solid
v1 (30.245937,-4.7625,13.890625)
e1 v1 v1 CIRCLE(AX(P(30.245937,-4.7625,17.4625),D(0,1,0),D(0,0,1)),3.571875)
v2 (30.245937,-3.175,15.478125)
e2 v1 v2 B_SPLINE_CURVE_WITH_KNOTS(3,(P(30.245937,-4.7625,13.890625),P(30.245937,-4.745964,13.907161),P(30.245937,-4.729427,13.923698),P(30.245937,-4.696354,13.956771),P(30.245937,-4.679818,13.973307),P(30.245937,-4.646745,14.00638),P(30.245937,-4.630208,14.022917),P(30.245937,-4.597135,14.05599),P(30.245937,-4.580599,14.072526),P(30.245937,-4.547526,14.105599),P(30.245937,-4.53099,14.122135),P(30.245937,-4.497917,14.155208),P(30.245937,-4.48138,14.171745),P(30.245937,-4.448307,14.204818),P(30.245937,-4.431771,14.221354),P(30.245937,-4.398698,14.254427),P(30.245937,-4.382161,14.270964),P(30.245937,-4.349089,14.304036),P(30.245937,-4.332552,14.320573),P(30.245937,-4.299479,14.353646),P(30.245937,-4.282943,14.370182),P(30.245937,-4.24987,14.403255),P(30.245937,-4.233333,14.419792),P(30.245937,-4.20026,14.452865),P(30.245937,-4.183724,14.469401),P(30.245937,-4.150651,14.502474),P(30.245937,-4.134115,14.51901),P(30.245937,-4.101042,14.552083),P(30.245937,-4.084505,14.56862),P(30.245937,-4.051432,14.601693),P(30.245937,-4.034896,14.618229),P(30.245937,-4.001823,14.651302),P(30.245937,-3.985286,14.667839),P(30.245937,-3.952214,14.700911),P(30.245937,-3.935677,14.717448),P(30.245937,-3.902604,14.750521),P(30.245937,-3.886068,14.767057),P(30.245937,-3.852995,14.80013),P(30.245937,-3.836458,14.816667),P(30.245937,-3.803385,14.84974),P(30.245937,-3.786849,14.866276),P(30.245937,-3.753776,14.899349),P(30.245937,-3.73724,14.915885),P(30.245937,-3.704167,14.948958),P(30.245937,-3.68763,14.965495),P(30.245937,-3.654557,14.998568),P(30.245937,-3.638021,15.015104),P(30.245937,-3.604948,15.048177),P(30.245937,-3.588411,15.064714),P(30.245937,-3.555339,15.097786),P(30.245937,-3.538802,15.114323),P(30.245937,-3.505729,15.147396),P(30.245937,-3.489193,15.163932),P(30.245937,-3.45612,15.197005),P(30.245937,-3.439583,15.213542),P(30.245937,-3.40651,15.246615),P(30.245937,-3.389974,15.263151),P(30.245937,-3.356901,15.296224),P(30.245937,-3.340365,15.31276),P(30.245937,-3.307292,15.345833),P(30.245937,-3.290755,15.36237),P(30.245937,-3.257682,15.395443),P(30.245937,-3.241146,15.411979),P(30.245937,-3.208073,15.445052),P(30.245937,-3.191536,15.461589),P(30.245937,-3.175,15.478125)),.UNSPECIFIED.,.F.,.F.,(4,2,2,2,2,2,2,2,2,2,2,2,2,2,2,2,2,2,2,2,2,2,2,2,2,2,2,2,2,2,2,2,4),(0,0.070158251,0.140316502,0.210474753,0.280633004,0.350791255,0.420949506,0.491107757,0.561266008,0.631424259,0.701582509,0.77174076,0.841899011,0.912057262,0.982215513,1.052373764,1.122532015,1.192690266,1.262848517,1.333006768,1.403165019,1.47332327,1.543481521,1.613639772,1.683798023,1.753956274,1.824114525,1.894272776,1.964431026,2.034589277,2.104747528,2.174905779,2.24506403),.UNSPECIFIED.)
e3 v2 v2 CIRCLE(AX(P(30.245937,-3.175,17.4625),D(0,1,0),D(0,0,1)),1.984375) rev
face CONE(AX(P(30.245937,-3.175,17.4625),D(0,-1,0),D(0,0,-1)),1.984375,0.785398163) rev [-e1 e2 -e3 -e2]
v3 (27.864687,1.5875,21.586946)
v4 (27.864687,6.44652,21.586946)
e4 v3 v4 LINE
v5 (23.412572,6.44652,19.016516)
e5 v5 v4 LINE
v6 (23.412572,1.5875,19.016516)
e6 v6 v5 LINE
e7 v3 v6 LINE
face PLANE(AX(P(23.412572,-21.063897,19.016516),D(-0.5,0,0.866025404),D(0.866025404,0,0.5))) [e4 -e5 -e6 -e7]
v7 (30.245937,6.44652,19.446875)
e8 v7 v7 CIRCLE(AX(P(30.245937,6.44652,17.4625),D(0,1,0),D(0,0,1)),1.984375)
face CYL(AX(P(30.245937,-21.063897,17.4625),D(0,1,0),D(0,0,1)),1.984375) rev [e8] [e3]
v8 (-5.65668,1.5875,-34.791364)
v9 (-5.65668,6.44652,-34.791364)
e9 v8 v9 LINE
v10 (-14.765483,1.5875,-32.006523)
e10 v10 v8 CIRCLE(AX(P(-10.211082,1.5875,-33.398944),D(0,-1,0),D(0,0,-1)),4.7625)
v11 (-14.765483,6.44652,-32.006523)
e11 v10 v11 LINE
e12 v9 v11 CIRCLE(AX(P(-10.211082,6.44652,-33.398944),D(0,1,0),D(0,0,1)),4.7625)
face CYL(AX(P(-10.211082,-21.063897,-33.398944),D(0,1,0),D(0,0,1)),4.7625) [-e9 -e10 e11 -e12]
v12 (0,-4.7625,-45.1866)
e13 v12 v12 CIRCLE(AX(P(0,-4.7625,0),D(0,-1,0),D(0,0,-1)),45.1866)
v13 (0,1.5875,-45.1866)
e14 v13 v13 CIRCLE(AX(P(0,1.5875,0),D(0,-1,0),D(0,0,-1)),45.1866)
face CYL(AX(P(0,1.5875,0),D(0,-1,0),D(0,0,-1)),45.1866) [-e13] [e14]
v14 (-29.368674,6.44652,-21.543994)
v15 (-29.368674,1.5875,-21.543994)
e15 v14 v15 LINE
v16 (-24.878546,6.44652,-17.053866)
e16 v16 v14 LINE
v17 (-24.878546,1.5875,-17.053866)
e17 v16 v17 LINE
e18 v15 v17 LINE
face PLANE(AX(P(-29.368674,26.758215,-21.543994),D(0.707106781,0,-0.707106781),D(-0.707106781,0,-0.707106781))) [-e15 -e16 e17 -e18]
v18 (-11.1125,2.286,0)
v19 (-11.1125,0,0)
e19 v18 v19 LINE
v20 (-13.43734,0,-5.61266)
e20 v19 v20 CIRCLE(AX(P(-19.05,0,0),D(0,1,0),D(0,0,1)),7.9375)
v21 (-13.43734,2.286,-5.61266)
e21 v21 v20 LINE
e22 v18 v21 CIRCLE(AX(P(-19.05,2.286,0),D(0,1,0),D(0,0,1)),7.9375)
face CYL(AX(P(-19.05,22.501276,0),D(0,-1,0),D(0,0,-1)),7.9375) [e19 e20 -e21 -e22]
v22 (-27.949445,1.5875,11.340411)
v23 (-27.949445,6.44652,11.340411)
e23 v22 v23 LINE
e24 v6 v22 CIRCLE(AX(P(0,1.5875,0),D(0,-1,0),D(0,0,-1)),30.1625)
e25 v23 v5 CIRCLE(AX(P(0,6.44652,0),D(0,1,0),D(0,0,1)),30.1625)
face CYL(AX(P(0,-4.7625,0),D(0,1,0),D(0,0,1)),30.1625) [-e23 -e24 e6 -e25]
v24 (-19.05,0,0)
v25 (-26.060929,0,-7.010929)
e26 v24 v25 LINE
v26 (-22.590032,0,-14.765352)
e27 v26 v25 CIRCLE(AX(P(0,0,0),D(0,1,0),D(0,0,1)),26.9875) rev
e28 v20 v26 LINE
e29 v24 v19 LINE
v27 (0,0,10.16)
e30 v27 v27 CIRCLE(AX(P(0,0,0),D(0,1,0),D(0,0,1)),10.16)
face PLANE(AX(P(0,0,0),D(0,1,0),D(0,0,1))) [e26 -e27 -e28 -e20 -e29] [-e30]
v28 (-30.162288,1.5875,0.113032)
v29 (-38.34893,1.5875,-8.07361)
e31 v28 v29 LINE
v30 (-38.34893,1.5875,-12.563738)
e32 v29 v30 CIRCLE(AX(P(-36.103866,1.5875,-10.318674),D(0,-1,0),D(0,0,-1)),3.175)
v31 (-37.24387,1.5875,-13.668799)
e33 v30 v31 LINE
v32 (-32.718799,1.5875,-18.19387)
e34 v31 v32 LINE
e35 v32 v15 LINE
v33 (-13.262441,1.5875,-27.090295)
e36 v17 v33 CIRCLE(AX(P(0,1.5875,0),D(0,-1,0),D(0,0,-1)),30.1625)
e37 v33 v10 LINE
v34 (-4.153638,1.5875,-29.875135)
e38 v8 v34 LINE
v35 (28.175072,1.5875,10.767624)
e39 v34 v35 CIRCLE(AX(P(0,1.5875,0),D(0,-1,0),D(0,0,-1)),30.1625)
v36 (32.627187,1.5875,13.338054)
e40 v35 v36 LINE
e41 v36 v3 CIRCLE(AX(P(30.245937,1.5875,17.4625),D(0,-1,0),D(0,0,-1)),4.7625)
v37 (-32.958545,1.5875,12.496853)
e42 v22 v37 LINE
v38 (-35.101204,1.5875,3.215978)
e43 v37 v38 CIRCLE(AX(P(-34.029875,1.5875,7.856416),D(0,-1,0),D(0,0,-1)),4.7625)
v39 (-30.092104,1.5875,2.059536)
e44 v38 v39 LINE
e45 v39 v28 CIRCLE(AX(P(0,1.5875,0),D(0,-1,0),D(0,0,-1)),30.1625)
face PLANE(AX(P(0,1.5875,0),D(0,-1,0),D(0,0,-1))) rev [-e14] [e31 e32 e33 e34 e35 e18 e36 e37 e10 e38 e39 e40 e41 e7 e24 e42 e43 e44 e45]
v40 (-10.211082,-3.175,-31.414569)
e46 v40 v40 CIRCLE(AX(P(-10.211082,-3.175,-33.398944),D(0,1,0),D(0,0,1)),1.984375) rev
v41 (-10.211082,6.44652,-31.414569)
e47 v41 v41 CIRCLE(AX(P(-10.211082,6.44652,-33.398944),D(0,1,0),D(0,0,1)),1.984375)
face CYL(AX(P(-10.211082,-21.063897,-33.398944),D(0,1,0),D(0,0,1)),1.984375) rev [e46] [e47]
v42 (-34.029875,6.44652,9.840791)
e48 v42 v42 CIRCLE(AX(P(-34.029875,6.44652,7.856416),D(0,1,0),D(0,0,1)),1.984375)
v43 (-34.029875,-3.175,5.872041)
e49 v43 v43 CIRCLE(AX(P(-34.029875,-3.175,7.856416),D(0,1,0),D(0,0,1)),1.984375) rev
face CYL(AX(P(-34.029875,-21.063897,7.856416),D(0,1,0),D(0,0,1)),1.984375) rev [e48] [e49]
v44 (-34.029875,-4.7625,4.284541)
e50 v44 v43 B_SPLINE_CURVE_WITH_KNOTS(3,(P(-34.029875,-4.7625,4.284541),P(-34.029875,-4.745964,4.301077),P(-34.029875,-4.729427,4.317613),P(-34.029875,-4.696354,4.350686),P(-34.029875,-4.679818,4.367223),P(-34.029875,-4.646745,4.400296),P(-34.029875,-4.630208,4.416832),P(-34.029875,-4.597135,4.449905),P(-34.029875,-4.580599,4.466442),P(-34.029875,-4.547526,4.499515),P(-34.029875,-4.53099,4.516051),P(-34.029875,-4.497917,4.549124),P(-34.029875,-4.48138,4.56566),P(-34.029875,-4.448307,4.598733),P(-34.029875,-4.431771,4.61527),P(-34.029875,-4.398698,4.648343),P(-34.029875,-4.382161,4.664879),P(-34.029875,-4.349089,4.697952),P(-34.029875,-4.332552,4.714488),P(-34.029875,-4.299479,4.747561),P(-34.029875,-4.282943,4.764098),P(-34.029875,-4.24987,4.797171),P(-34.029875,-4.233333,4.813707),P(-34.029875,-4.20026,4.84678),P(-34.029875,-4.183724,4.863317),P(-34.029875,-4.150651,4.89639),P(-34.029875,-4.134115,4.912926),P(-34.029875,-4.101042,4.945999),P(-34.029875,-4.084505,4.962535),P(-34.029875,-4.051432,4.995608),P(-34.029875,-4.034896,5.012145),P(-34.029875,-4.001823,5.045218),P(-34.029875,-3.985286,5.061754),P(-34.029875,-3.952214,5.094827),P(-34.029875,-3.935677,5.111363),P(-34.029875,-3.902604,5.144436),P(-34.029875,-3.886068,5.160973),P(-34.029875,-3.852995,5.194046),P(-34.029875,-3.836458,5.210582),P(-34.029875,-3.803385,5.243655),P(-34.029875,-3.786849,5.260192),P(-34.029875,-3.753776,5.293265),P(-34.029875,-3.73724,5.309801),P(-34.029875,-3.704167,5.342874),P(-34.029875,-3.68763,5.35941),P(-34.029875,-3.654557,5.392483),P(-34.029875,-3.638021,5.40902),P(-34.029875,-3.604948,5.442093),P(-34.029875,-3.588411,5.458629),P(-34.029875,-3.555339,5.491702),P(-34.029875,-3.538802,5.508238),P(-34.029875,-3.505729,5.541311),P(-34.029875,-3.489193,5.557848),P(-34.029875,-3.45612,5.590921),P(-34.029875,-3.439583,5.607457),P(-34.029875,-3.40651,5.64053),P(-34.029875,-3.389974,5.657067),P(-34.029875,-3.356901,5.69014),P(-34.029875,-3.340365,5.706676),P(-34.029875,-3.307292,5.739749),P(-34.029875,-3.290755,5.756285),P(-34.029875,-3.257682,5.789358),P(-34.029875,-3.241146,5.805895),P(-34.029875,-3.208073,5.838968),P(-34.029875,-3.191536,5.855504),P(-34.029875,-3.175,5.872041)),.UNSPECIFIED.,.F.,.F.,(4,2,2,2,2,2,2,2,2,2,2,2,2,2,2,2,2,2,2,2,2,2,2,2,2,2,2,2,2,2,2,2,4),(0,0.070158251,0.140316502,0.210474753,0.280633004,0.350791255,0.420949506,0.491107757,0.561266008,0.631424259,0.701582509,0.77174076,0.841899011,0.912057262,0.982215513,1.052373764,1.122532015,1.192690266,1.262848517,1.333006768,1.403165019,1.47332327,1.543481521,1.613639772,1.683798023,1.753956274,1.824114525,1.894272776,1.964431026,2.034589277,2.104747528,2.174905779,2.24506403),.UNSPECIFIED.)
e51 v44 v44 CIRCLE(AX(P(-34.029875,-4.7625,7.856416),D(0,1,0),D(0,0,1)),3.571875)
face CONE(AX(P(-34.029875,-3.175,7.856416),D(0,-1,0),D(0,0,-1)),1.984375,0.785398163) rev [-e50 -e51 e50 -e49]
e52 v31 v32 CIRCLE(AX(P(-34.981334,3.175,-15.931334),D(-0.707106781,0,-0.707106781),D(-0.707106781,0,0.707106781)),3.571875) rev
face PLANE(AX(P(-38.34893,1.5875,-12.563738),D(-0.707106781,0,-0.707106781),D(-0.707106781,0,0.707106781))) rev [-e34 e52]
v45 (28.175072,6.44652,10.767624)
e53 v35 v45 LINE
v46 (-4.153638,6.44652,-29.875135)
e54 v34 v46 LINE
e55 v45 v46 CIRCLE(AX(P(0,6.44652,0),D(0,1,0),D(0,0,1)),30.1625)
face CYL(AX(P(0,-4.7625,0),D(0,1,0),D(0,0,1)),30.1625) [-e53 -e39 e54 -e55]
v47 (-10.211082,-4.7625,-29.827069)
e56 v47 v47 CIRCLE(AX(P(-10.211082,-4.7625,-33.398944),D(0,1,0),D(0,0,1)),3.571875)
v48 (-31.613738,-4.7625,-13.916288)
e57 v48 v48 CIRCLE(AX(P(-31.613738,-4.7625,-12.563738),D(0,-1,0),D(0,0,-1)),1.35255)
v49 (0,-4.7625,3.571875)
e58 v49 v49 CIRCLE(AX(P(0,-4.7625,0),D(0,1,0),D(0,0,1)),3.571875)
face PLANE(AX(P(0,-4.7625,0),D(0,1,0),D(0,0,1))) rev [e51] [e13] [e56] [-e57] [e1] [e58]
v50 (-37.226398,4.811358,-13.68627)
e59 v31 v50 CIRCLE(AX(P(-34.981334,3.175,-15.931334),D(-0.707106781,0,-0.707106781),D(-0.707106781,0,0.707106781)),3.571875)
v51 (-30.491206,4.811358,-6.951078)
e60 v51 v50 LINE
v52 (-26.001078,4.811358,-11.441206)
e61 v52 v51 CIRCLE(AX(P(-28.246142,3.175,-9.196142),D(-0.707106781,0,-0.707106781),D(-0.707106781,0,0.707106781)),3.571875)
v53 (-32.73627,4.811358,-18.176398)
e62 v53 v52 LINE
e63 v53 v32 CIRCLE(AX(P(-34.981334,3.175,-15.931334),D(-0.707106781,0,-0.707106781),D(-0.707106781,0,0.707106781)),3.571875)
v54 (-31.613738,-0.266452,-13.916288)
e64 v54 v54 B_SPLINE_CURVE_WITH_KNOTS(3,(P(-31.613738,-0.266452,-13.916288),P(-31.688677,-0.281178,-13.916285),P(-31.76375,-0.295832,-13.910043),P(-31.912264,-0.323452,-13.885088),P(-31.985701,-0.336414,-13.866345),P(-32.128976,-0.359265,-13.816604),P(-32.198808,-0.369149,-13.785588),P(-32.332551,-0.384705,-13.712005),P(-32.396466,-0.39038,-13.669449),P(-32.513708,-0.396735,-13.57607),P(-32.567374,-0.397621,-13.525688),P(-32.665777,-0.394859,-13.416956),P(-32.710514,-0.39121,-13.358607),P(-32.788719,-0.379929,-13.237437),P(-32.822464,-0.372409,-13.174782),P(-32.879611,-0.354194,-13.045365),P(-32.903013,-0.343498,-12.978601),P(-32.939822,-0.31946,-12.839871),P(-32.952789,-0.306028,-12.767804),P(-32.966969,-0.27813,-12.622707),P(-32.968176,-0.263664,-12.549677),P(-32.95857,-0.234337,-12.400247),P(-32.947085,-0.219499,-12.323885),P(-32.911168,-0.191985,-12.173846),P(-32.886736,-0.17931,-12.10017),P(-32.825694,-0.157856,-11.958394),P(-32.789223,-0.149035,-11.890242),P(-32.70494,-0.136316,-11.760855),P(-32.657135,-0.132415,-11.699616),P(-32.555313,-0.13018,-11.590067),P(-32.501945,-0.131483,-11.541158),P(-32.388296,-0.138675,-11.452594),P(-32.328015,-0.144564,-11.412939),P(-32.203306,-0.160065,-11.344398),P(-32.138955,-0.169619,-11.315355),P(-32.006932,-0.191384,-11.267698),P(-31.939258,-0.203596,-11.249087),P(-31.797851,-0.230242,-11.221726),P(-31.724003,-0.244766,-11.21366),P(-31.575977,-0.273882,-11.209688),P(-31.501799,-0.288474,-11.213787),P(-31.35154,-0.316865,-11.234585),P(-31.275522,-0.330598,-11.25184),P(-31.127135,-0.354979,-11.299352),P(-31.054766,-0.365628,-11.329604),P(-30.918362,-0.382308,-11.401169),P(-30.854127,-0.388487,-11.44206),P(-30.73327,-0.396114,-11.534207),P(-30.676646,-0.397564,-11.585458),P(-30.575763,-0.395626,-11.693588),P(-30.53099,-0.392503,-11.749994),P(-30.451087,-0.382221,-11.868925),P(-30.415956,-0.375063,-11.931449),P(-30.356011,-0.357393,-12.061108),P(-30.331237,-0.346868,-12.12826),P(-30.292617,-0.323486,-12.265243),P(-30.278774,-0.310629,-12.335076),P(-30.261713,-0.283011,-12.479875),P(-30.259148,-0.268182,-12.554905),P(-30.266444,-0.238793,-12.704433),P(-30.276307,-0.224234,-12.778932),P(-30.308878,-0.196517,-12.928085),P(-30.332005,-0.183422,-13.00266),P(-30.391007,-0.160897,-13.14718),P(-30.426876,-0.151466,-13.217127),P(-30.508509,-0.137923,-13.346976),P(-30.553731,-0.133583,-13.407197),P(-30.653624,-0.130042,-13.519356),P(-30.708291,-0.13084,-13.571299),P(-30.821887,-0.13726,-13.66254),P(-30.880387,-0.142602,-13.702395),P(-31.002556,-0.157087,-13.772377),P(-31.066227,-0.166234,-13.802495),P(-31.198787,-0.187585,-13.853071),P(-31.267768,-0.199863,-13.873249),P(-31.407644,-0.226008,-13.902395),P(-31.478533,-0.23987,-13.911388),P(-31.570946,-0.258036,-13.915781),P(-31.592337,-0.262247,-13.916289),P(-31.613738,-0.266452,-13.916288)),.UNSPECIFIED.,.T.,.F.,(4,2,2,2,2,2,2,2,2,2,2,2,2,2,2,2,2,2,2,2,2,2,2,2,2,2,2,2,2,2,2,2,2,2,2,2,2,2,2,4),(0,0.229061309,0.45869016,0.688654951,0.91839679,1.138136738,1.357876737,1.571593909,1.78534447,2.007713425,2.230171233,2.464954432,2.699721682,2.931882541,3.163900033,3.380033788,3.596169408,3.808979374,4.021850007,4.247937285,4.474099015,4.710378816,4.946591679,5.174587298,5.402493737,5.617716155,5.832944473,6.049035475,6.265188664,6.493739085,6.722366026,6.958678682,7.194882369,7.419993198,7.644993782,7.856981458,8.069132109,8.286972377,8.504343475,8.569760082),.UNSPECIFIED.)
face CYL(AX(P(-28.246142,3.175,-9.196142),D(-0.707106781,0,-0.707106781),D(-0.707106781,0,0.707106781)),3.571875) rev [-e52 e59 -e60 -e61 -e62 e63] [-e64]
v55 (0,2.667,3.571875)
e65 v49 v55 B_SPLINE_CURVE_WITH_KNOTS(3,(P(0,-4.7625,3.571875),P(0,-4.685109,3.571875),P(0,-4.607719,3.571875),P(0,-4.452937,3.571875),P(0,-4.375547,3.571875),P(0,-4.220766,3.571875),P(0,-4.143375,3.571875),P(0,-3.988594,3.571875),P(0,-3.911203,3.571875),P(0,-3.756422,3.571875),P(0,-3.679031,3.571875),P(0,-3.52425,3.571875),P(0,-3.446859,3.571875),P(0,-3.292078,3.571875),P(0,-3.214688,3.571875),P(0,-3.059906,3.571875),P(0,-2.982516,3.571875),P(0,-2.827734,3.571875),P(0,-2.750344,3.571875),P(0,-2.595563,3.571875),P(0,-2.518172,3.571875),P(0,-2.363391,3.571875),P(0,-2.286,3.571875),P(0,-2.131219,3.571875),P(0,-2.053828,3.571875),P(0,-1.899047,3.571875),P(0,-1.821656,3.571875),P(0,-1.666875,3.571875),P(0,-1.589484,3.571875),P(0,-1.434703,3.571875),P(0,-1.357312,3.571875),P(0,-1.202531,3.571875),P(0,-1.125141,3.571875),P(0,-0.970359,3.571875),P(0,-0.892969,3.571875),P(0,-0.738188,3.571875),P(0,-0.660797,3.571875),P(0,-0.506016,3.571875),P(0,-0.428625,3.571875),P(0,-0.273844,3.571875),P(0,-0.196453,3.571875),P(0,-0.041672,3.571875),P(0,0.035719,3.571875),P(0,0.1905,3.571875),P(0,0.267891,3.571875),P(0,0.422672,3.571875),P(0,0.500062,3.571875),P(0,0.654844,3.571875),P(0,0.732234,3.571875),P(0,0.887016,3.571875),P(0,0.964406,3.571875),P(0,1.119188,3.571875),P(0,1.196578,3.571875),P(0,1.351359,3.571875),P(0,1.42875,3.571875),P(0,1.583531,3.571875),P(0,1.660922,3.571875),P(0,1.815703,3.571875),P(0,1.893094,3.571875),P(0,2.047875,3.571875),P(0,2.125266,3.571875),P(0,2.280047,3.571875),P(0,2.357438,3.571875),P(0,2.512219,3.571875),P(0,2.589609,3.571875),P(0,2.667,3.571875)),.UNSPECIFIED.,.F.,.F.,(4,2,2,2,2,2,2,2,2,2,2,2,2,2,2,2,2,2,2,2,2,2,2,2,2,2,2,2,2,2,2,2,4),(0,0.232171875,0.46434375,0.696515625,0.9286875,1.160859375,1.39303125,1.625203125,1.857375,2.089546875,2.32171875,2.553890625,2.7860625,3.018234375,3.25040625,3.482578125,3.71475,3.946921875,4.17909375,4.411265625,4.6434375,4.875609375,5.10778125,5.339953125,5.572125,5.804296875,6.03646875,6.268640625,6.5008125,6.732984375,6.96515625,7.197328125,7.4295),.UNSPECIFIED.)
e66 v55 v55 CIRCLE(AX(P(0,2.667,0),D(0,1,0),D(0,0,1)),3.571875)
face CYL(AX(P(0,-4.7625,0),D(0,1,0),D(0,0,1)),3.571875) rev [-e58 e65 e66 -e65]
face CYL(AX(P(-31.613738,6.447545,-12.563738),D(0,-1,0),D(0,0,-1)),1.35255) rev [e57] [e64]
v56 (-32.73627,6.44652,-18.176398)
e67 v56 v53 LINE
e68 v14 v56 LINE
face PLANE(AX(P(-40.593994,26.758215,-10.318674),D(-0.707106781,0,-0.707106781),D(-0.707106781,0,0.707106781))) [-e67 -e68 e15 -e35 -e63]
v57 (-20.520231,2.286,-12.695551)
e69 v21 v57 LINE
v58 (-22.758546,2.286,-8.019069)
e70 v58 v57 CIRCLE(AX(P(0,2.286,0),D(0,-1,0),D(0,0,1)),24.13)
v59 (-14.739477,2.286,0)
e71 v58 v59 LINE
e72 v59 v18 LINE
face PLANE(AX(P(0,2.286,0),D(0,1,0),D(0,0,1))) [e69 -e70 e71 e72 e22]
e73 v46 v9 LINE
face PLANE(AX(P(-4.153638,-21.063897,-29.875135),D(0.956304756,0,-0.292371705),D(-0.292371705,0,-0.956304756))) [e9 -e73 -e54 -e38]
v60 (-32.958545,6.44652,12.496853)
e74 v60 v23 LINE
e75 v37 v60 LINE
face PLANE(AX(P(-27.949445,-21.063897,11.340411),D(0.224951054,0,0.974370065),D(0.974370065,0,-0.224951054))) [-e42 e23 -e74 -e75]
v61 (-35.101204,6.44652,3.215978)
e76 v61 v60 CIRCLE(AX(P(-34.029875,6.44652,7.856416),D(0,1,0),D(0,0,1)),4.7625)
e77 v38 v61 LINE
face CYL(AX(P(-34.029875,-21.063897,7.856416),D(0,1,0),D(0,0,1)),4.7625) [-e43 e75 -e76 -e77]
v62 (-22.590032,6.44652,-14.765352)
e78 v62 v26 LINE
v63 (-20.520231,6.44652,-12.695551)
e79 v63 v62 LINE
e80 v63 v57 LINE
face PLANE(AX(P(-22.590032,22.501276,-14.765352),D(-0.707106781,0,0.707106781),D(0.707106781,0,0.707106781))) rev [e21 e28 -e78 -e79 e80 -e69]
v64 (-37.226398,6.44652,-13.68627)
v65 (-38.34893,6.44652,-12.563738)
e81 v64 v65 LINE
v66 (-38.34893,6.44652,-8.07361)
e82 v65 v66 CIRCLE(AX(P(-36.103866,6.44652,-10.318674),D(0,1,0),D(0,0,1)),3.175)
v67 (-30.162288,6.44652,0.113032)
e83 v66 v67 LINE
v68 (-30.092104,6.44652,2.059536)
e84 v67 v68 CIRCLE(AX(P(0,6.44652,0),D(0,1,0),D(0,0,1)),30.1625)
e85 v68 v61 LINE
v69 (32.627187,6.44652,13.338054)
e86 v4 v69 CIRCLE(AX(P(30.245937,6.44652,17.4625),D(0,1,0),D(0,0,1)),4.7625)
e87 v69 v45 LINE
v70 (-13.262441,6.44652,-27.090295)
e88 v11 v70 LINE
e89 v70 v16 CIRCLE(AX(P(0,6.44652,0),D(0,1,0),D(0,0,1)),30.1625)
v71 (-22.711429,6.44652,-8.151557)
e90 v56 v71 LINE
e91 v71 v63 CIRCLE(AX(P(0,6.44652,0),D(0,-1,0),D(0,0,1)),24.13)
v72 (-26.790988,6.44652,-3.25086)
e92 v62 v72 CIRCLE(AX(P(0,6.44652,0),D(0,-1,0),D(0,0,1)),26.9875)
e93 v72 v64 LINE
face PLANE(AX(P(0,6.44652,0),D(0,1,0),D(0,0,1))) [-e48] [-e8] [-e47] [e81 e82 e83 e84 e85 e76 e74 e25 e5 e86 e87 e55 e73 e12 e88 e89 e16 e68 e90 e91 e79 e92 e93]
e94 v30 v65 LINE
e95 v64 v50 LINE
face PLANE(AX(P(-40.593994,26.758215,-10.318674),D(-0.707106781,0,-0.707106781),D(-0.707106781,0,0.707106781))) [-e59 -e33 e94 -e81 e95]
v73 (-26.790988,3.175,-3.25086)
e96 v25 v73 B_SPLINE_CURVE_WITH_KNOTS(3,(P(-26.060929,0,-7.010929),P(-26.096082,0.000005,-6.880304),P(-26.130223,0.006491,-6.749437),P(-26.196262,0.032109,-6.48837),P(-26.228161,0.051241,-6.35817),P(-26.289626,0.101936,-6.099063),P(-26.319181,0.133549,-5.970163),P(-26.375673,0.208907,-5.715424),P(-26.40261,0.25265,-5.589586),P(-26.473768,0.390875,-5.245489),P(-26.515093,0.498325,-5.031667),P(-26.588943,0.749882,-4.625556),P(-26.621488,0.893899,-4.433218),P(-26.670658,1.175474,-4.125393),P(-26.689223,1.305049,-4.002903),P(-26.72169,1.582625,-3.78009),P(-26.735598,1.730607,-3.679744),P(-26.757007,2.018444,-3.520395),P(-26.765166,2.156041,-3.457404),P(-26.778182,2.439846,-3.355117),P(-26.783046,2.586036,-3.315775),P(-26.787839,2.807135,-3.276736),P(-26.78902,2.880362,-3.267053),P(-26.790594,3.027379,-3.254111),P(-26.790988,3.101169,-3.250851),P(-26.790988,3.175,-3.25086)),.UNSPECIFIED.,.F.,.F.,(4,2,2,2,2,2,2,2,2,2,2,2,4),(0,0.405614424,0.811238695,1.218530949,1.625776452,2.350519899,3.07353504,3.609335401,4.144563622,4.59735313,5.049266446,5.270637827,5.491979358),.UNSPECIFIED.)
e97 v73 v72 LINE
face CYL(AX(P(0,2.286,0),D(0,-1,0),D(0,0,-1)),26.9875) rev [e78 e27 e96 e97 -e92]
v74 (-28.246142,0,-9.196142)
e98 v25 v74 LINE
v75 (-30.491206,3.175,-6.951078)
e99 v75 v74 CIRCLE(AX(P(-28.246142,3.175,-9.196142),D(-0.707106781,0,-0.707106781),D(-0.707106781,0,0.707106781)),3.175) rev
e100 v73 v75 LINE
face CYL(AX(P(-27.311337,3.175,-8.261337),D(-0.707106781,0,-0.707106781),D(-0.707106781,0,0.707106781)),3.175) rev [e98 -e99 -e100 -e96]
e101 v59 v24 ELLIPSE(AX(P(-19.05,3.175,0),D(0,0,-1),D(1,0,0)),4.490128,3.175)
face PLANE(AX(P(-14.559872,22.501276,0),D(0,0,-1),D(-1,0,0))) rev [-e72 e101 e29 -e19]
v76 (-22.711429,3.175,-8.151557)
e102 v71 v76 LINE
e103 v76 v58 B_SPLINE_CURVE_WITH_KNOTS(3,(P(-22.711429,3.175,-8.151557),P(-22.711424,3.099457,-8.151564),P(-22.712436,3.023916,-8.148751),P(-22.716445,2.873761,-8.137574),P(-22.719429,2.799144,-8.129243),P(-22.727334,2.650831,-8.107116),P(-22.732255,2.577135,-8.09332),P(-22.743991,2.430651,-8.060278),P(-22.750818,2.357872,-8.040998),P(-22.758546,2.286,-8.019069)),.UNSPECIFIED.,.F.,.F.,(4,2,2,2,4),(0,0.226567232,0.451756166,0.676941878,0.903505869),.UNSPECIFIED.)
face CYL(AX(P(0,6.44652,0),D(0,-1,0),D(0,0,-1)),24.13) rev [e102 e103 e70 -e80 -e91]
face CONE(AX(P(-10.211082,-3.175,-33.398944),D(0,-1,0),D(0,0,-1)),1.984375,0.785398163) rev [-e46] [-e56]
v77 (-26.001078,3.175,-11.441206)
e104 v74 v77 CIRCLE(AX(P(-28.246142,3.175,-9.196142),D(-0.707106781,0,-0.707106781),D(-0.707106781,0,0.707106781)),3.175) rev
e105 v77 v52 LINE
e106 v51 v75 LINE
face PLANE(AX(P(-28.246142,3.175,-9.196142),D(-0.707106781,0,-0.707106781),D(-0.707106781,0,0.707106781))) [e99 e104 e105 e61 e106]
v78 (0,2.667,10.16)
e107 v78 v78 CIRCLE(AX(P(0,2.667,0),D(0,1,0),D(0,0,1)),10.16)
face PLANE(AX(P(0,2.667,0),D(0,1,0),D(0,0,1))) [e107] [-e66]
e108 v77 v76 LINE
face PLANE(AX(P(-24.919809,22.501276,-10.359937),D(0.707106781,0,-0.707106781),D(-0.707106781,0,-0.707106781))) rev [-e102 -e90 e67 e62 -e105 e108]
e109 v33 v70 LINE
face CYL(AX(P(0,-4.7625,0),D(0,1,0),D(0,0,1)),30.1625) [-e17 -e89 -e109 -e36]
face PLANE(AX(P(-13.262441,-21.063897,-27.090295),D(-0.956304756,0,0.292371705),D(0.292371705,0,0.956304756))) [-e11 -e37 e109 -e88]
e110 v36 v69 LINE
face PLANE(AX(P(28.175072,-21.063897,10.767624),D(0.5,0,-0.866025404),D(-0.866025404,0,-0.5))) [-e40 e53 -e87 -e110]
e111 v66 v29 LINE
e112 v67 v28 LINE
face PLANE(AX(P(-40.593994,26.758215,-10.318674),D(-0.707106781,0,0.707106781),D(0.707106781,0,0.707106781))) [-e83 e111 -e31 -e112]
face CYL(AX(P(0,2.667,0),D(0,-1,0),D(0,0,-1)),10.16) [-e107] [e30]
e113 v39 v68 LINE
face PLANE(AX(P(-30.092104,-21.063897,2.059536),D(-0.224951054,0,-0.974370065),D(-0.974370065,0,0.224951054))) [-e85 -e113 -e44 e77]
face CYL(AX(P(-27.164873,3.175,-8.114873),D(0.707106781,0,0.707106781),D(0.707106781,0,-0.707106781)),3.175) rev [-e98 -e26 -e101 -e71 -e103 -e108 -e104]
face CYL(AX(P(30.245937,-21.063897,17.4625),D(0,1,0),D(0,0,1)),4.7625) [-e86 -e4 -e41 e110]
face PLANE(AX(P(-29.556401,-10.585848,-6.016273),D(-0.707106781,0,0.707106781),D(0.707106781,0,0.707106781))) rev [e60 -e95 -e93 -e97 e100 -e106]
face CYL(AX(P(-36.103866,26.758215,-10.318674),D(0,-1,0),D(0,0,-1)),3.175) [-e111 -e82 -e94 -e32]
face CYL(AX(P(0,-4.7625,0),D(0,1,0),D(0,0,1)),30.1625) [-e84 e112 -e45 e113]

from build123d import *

# Parameters (mm, degrees)
SKETCH1_R          = 30.1625
SKETCH1_R_2        = 3.571875
EXTRUDE1_DEPTH     = 4.7625
EXTRUDE2_START     = 2.286
SKETCH2_R          = 30.1625
SKETCH2_R_2        = 26.9875
EXTRUDE2_DEPTH     = 2.286
EXTRUDE3_START     = 2.286
EXTRUDE3_DEPTH     = 2.286
CUT_EXTRUDE1_START = -2.286
CUT_EXTRUDE1_DEPTH = 2.286
EXTRUDE4_START     = 4.16052
EXTRUDE4_DEPTH     = 4.16052
EXTRUDE6_START     = -4.7625
EXTRUDE6_DEPTH     = 4.7625
EXTRUDE7_START     = 6.44652
EXTRUDE7_DEPTH     = 6.44652
FILLET1_R          = 3.175
EXTRUDE8_START     = -4.7625
EXTRUDE8_OUTLINE_R = 1.984375
EXTRUDE8_DEPTH     = 11.20902
EXTRUDE8_START_2   = -36.000693059
EXTRUDE8_2_DEPTH   = 9.525
EXTRUDE9_START     = 2.667
SKETCH11_R         = 10.16
SKETCH11_R_2       = 3.571875
EXTRUDE9_DEPTH     = 2.667
SPLIT1_START       = -4.7625
SPLIT1_OUTLINE_R   = 1.35255
SPLIT1_DEPTH       = 11.20902
EXTRUDE10_START    = -6.35
SKETCH13_R         = 45.1866
EXTRUDE10_DEPTH    = 6.35


# Read off the part's stored shape, not the designer's step: Extrude8, Split1
with BuildPart() as part:
    # Sketch1 → Extrude1 (new body)
    with BuildSketch(Plane(origin=(0, 0, 0), x_dir=(1, 0, 0), z_dir=(0, 1, 0))):
        with Locations(Location((0, 0, 0), (0, 0, 270))):
            Circle(SKETCH1_R)
        with Locations(Location((0, 0, 0), (0, 0, 270))):
            Circle(SKETCH1_R_2, mode=Mode.SUBTRACT)
    extrude(amount=-EXTRUDE1_DEPTH)

    # Sketch2 → Extrude2 (add)
    with BuildSketch(Plane(origin=(0, 0, 0), x_dir=(-1, 0, 0), z_dir=(0, 1, 0)).offset(EXTRUDE2_START)):
        with Locations(Location((0, 0, 0), (0, 0, 90))):
            Circle(SKETCH2_R)
        with Locations(Location((0, 0, 0), (0, 0, 90))):
            Circle(SKETCH2_R_2, mode=Mode.SUBTRACT)
    extrude(amount=-EXTRUDE2_DEPTH)

    # Sketch3 → Extrude3 (add)
    with BuildSketch(Plane(origin=(0, 0, 0), x_dir=(-1, 0, 0), z_dir=(0, 1, 0)).offset(EXTRUDE3_START)):
        with BuildLine():
            Line((24.919808713, -10.359936774), (14.559871939, 0))
            Line((14.559871939, 0), (11.1125, 0))
            ThreePointArc((11.1125, 0), (11.716706211, -3.037549744), (13.437339924, -5.612660076))
            Line((13.437339924, -5.612660076), (22.590031817, -14.765351968))
            ThreePointArc((22.590031817, -14.765351968), (23.856826226, -12.616536715), (24.919808713, -10.359936774))
        make_face()
    extrude(amount=-EXTRUDE3_DEPTH)

    # Sketch4 → Cut-Extrude1 (cut)
    with BuildSketch(Plane(origin=(0, 2.286, 0), x_dir=(-1, 0, 0), z_dir=(0, 1, 0)).offset(CUT_EXTRUDE1_START)):
        with BuildLine():
            Line((27.327148629, -12.767276689), (24.919808713, -10.359936774))
            ThreePointArc((24.919808713, -10.359936774), (26.098589577, -6.86940888), (26.790988464, -3.250860404))
            Line((26.790988464, -3.250860404), (29.556401367, -6.016273306))
            ThreePointArc((29.556401367, -6.016273306), (28.64137875, -9.457686268), (27.327148629, -12.767276689))
        make_face()
    extrude(amount=CUT_EXTRUDE1_DEPTH, mode=Mode.SUBTRACT)

    # Sketch5 → Extrude4 (add)
    with BuildSketch(Plane(origin=(0, 2.286, 0), x_dir=(-1, 0, 0), z_dir=(0, 1, 0)).offset(EXTRUDE4_START)):
        with BuildLine():
            ThreePointArc((29.556401367, -6.016273306), (-28.64137875, 9.457686268), (27.327148629, -12.767276689))
            Line((27.327148629, -12.767276689), (22.711429166, -8.151557227))
            ThreePointArc((22.711429166, -8.151557227), (21.734904661, -10.480974162), (20.52023101, -12.695551161))
            Line((20.52023101, -12.695551161), (22.590031817, -14.765351968))
            ThreePointArc((22.590031817, -14.765351968), (-25.352853291, 9.24975601), (26.790988464, -3.250860404))
            Line((26.790988464, -3.250860404), (29.556401367, -6.016273306))
        make_face()
    extrude(amount=-EXTRUDE4_DEPTH)

    # Sketch7 → Extrude6 (add)
    with BuildSketch(Plane.XZ.offset(4.7625).offset(EXTRUDE6_START)):
        with BuildLine():
            Line((-29.368674114, -21.543994265), (-24.878546053, -17.053866205))
            ThreePointArc((-24.878546053, -17.053866205), (-28.827919749, -8.872848988), (-30.162288209, 0.113031942))
            Line((-30.162288209, 0.113031942), (-40.593994265, -10.318674114))
            Line((-40.593994265, -10.318674114), (-29.368674114, -21.543994265))
        make_face()
    extrude(amount=EXTRUDE6_DEPTH)

    # Sketch8 → Extrude7 (add)
    with BuildSketch(Plane(origin=(0, 0, 0), x_dir=(-1, 0, 0), z_dir=(0, 1, 0)).offset(EXTRUDE7_START)):
        with BuildLine():
            Line((27.327148629, -12.767276689), (32.736270159, -18.17639822))
            Line((32.736270159, -18.17639822), (29.368674114, -21.543994265))
            Line((29.368674114, -21.543994265), (24.878546053, -17.053866205))
            ThreePointArc((24.878546053, -17.053866205), (26.190692082, -14.960750466), (27.327148629, -12.767276689))
        make_face()
        with BuildLine():
            Line((29.556401367, -6.016273306), (37.22639822, -13.686270159))
            Line((37.22639822, -13.686270159), (40.593994265, -10.318674114))
            Line((40.593994265, -10.318674114), (30.162288209, 0.113031942))
            ThreePointArc((30.162288209, 0.113031942), (30.016205071, -2.96712645), (29.556401367, -6.016273306))
        make_face()
    extrude(amount=-EXTRUDE7_DEPTH)

    # Fillet1
    # the kernel refuses this fillet: 3.175 mm, written as the material it adds along each edge
    with BuildSketch(Plane(origin=(-32.736270159, 0, -18.17639822), x_dir=(-0.7071067811865481, 0, 0.707106781186547), z_dir=(0.707106781186547, 0, 0.707106781186548))) as fillet1_piece_1_section:
        with BuildLine():
            CenterArc((FILLET1_R, -FILLET1_R), FILLET1_R, 90, 90)
            Line((0, -FILLET1_R), (0, 0))
            Line((0, 0), (FILLET1_R, 0))
        make_face()
    fillet1_piece_1 = extrude(amount=33.642808877, mode=Mode.PRIVATE)
    fillet1_piece_1 = split(fillet1_piece_1, bisect_by=Plane(origin=(-28.125346977, 2.286, -12.485884273), z_dir=(0, -1, 0)), keep=Keep.TOP, mode=Mode.PRIVATE)
    fillet1_piece_1 = fillet1_piece_1 - Plane(origin=(0, 0.637531041, 0), x_dir=(-0.9412113206103934, 0, -0.33781836829106776), z_dir=(0, 1, 0)) * Cylinder(24.13, 80, mode=Mode.PRIVATE)
    add(fillet1_piece_1)
    with BuildSketch(Plane(origin=(-32.736270159, 0, -18.17639822), x_dir=(-0.7071067811865481, 0, 0.707106781186547), z_dir=(0.707106781186547, 0, 0.707106781186548))) as fillet1_piece_2_section:
        with BuildLine():
            CenterArc((FILLET1_R, -FILLET1_R), FILLET1_R, 90, 90)
            Line((0, -FILLET1_R), (0, 0))
            Line((0, 0), (FILLET1_R, 0))
        make_face()
    fillet1_piece_2 = extrude(amount=33.642808877, mode=Mode.PRIVATE)
    fillet1_piece_2 = split(fillet1_piece_2, bisect_by=Plane(origin=(-27.721701516, 2.286, -13.167406565), z_dir=(0, 1, 0)), keep=Keep.TOP, mode=Mode.PRIVATE)
    fillet1_piece_2 = fillet1_piece_2 - Plane(origin=(0, 2.641516211, 0), x_dir=(-0.9412113206103934, 0, -0.33781836829106776), z_dir=(0, 1, 0)) * Cylinder(24.13, 80, mode=Mode.PRIVATE)
    add(fillet1_piece_2)
    with BuildSketch(Plane(origin=(-32.736270159, 0, -18.17639822), x_dir=(-0.7071067811865481, 0, 0.707106781186547), z_dir=(0.707106781186547, 0, 0.707106781186548))) as fillet1_piece_3_section:
        with BuildLine():
            CenterArc((FILLET1_R, -FILLET1_R), FILLET1_R, 90, 90)
            Line((0, -FILLET1_R), (0, 0))
            Line((0, 0), (FILLET1_R, 0))
        make_face()
    fillet1_piece_3 = extrude(amount=33.642808877, mode=Mode.PRIVATE)
    fillet1_piece_3 = split(fillet1_piece_3, bisect_by=Plane(origin=(-19.232138403, 0.68020426, 0), z_dir=(0, 0, -1)), keep=Keep.TOP, mode=Mode.PRIVATE)
    fillet1_piece_3 = split(fillet1_piece_3, bisect_by=Plane(origin=(-19.232138403, 2.286, -3.714419145), z_dir=(0, -1, 0)), keep=Keep.TOP, mode=Mode.PRIVATE)
    fillet1_piece_3 = fillet1_piece_3 & Plane(origin=(0, 0.68020426, 0), x_dir=(-0.9412113206103934, 0, -0.33781836829106776), z_dir=(0, 1, 0)) * Cylinder(24.13, 80, mode=Mode.PRIVATE)
    add(fillet1_piece_3)
    with BuildSketch(Plane(origin=(-21.178328388, 0, 2.361799672), x_dir=(0.7071067811865476, 0, -0.7071067811865474), z_dir=(-0.7071067811865474, 0, -0.7071067811865477))) as fillet1_piece_4_section:
        with BuildLine():
            CenterArc((FILLET1_R, -FILLET1_R), FILLET1_R, 90, 90)
            Line((0, -FILLET1_R), (0, 0))
            Line((0, 0), (FILLET1_R, 0))
        make_face()
    fillet1_piece_4 = extrude(amount=22.695398005, mode=Mode.PRIVATE)
    fillet1_piece_4 = fillet1_piece_4 - Plane(origin=(0, 0.732754622, 0), x_dir=(0, 0, 1), z_dir=(0, 1, 0)) * Cylinder(26.9875, 59, mode=Mode.PRIVATE)
    add(fillet1_piece_4)

    # Extrude8 outline → Extrude8 (add)
    # profile 1 of 3: a face of its own
    with BuildSketch(Plane(origin=(0, 0, 0), x_dir=(1, 0, 0), z_dir=(0, 1, 0)).offset(EXTRUDE8_START)):
        with BuildLine():
            ThreePointArc((-13.262441208, 27.090294562), (-8.818661544, 28.844542202), (-4.153638407, 29.87513505))
            Line((-4.153638407, 29.87513505), (-5.656680387, 34.791363846))
            ThreePointArc((-5.656680387, 34.791363846), (-11.603502031, 37.953345002), (-14.765483188, 32.006523358))
            Line((-14.765483188, 32.006523358), (-13.262441208, 27.090294562))
        make_face()
        with Locations((-10.211081787, 33.398943602)):
            Circle(EXTRUDE8_OUTLINE_R, mode=Mode.SUBTRACT)
    # profile 2 of 3: a face of its own
    with BuildSketch(Plane(origin=(0, 0, 0), x_dir=(1, 0, 0), z_dir=(0, 1, 0)).offset(EXTRUDE8_START)):
        with BuildLine():
            Line((-32.958545116, -12.496853006), (-27.949445097, -11.340411146))
            ThreePointArc((-27.949445097, -11.340411146), (-29.389437079, -6.785086176), (-30.09210389, -2.059536279))
            Line((-30.09210389, -2.059536279), (-35.101203909, -3.215978139))
            ThreePointArc((-35.101203909, -3.215978139), (-38.670311946, -8.927744969), (-32.958545116, -12.496853006))
        make_face()
        with Locations((-34.029874513, -7.856415573)):
            Circle(EXTRUDE8_OUTLINE_R, mode=Mode.SUBTRACT)
    # profile 3 of 3: a face of its own
    with BuildSketch(Plane(origin=(0, 0, 0), x_dir=(1, 0, 0), z_dir=(0, 1, 0)).offset(EXTRUDE8_START)):
        with BuildLine():
            Line((32.627187227, -13.338054014), (28.175071934, -10.767624052))
            ThreePointArc((28.175071934, -10.767624052), (26.121491241, -15.08125), (23.412571934, -19.016516022))
            Line((23.412571934, -19.016516022), (27.864687227, -21.586945986))
            ThreePointArc((27.864687227, -21.586945986), (34.370383213, -19.84375), (32.627187227, -13.338054014))
        make_face()
        with Locations((30.245937227, -17.4625)):
            Circle(EXTRUDE8_OUTLINE_R, mode=Mode.SUBTRACT)
    extrude(amount=EXTRUDE8_DEPTH)

    # Extrude8 2 outline → Extrude8 2 (cut)
    with BuildSketch(Plane(origin=(0, 0, 0), x_dir=(0.7071067811865474, 0, -0.7071067811865477), z_dir=(0.7071067811865476, 0, 0.7071067811865476)).offset(EXTRUDE8_START_2)):
        with BuildLine():
            ThreePointArc((-16.645384182, 4.811357545), (-13.470384182, -0.396875), (-10.295384182, 4.811357545))
            Line((-10.295384182, 4.811357545), (-10.295384182, 3.175))
            ThreePointArc((-10.295384182, 3.175), (-11.225320152, 0.92993597), (-13.470384182, 0))
            ThreePointArc((-13.470384182, 0), (-15.715448212, 0.92993597), (-16.645384182, 3.175))
            Line((-16.645384182, 3.175), (-16.645384182, 4.811357545))
        make_face()
    extrude(amount=EXTRUDE8_2_DEPTH, mode=Mode.SUBTRACT)

    # Sketch11 → Extrude9 (add)
    with BuildSketch(Plane(origin=(0, 0, 0), x_dir=(-1, 0, 0), z_dir=(0, 1, 0)).offset(EXTRUDE9_START)):
        with Locations(Location((0, 0, 0), (0, 0, 90))):
            Circle(SKETCH11_R)
        with Locations(Location((0, 0, 0), (0, 0, 90))):
            Circle(SKETCH11_R_2, mode=Mode.SUBTRACT)
    extrude(amount=-EXTRUDE9_DEPTH)

    # Split1 outline → Split1 (cut)
    with BuildSketch(Plane(origin=(0, 0, 0), x_dir=(1, 0, 0), z_dir=(0, 1, 0)).offset(SPLIT1_START)):
        with Locations((-31.613738144, 12.563738144)):
            Circle(SPLIT1_OUTLINE_R)
        with BuildLine():
            Line((-40.593994265, 10.318674114), (-38.348930235, 8.073610084))
            ThreePointArc((-38.348930235, 8.073610084), (-39.278866205, 10.318674114), (-38.348930235, 12.563738144))
            Line((-38.348930235, 12.563738144), (-40.593994265, 10.318674114))
        make_face()
    extrude(amount=SPLIT1_DEPTH, mode=Mode.SUBTRACT)

    # Split1 2 outline → Split1 2 (revolve, cut)
    with BuildSketch(Plane(origin=(30.245937227, 0, 17.4625), x_dir=(1, 0, 0), z_dir=(0, 0, 1))):
        Polygon((3.571875, -4.7625), (1.984375, -3.175), (1.984375, -4.7625), align=None)
    revolve(axis=Axis((30.245937227, 0, 17.4625), (0, 1, 0)), mode=Mode.SUBTRACT)

    # Split1 3 outline → Split1 3 (revolve, cut)
    with BuildSketch(Plane(origin=(-10.211081787, 0, -33.398943602), x_dir=(1, 0, 0), z_dir=(0, 0, 1))):
        Polygon((3.571875, -4.7625), (1.984375, -3.175), (1.984375, -4.7625), align=None)
    revolve(axis=Axis((-10.211081787, 0, -33.398943602), (0, 1, 0)), mode=Mode.SUBTRACT)

    # Split1 4 outline → Split1 4 (revolve, cut)
    with BuildSketch(Plane(origin=(-34.029874513, 0, 7.856415573), x_dir=(1, 0, 0), z_dir=(0, 0, 1))):
        Polygon((3.571875, -4.7625), (1.984375, -3.175), (1.984375, -4.7625), align=None)
    revolve(axis=Axis((-34.029874513, 0, 7.856415573), (0, 1, 0)), mode=Mode.SUBTRACT)

    # Sketch13 → Extrude10 (add)
    with BuildSketch(Plane.XZ.offset(4.7625).offset(EXTRUDE10_START)):
        with Locations(Location((0, 0, 0), (0, 0, 270))):
            Circle(SKETCH13_R)
        with BuildLine():
            Line((-30.162288209, 0.113031942), (-38.348930235, -8.073610084))
            ThreePointArc((-38.348930235, -8.073610084), (-39.278866205, -10.318674114), (-38.348930235, -12.563738144))
            Line((-38.348930235, -12.563738144), (-29.368674114, -21.543994265))
            Line((-29.368674114, -21.543994265), (-24.878546053, -17.053866205))
            ThreePointArc((-24.878546053, -17.053866205), (-19.719690689, -22.82345735), (-13.262441208, -27.090294562))
            Line((-13.262441208, -27.090294562), (-14.765483188, -32.006523358))
            ThreePointArc((-14.765483188, -32.006523358), (-11.603502031, -37.953345002), (-5.656680387, -34.791363846))
            Line((-5.656680387, -34.791363846), (-4.153638407, -29.87513505))
            ThreePointArc((-4.153638407, -29.87513505), (23.605418531, -18.776597728), (28.175071935, 10.767624052))
            Line((28.175071935, 10.767624052), (32.627187227, 13.338054014))
            ThreePointArc((32.627187227, 13.338054014), (34.370383213, 19.84375), (27.864687227, 21.586945986))
            Line((27.864687227, 21.586945986), (23.412571935, 19.016516023))
            ThreePointArc((23.412571935, 19.016516023), (-4.458301363, 29.831190979), (-27.949445098, 11.340411146))
            Line((-27.949445098, 11.340411146), (-32.958545116, 12.496853006))
            ThreePointArc((-32.958545116, 12.496853006), (-38.670311946, 8.927744969), (-35.101203909, 3.215978139))
            Line((-35.101203909, 3.215978139), (-30.092103891, 2.059536279))
            ThreePointArc((-30.092103891, 2.059536279), (-30.142912295, 1.086850785), (-30.162288209, 0.113031942))
        make_face(mode=Mode.SUBTRACT)
    extrude(amount=EXTRUDE10_DEPTH)


solid = part.part
